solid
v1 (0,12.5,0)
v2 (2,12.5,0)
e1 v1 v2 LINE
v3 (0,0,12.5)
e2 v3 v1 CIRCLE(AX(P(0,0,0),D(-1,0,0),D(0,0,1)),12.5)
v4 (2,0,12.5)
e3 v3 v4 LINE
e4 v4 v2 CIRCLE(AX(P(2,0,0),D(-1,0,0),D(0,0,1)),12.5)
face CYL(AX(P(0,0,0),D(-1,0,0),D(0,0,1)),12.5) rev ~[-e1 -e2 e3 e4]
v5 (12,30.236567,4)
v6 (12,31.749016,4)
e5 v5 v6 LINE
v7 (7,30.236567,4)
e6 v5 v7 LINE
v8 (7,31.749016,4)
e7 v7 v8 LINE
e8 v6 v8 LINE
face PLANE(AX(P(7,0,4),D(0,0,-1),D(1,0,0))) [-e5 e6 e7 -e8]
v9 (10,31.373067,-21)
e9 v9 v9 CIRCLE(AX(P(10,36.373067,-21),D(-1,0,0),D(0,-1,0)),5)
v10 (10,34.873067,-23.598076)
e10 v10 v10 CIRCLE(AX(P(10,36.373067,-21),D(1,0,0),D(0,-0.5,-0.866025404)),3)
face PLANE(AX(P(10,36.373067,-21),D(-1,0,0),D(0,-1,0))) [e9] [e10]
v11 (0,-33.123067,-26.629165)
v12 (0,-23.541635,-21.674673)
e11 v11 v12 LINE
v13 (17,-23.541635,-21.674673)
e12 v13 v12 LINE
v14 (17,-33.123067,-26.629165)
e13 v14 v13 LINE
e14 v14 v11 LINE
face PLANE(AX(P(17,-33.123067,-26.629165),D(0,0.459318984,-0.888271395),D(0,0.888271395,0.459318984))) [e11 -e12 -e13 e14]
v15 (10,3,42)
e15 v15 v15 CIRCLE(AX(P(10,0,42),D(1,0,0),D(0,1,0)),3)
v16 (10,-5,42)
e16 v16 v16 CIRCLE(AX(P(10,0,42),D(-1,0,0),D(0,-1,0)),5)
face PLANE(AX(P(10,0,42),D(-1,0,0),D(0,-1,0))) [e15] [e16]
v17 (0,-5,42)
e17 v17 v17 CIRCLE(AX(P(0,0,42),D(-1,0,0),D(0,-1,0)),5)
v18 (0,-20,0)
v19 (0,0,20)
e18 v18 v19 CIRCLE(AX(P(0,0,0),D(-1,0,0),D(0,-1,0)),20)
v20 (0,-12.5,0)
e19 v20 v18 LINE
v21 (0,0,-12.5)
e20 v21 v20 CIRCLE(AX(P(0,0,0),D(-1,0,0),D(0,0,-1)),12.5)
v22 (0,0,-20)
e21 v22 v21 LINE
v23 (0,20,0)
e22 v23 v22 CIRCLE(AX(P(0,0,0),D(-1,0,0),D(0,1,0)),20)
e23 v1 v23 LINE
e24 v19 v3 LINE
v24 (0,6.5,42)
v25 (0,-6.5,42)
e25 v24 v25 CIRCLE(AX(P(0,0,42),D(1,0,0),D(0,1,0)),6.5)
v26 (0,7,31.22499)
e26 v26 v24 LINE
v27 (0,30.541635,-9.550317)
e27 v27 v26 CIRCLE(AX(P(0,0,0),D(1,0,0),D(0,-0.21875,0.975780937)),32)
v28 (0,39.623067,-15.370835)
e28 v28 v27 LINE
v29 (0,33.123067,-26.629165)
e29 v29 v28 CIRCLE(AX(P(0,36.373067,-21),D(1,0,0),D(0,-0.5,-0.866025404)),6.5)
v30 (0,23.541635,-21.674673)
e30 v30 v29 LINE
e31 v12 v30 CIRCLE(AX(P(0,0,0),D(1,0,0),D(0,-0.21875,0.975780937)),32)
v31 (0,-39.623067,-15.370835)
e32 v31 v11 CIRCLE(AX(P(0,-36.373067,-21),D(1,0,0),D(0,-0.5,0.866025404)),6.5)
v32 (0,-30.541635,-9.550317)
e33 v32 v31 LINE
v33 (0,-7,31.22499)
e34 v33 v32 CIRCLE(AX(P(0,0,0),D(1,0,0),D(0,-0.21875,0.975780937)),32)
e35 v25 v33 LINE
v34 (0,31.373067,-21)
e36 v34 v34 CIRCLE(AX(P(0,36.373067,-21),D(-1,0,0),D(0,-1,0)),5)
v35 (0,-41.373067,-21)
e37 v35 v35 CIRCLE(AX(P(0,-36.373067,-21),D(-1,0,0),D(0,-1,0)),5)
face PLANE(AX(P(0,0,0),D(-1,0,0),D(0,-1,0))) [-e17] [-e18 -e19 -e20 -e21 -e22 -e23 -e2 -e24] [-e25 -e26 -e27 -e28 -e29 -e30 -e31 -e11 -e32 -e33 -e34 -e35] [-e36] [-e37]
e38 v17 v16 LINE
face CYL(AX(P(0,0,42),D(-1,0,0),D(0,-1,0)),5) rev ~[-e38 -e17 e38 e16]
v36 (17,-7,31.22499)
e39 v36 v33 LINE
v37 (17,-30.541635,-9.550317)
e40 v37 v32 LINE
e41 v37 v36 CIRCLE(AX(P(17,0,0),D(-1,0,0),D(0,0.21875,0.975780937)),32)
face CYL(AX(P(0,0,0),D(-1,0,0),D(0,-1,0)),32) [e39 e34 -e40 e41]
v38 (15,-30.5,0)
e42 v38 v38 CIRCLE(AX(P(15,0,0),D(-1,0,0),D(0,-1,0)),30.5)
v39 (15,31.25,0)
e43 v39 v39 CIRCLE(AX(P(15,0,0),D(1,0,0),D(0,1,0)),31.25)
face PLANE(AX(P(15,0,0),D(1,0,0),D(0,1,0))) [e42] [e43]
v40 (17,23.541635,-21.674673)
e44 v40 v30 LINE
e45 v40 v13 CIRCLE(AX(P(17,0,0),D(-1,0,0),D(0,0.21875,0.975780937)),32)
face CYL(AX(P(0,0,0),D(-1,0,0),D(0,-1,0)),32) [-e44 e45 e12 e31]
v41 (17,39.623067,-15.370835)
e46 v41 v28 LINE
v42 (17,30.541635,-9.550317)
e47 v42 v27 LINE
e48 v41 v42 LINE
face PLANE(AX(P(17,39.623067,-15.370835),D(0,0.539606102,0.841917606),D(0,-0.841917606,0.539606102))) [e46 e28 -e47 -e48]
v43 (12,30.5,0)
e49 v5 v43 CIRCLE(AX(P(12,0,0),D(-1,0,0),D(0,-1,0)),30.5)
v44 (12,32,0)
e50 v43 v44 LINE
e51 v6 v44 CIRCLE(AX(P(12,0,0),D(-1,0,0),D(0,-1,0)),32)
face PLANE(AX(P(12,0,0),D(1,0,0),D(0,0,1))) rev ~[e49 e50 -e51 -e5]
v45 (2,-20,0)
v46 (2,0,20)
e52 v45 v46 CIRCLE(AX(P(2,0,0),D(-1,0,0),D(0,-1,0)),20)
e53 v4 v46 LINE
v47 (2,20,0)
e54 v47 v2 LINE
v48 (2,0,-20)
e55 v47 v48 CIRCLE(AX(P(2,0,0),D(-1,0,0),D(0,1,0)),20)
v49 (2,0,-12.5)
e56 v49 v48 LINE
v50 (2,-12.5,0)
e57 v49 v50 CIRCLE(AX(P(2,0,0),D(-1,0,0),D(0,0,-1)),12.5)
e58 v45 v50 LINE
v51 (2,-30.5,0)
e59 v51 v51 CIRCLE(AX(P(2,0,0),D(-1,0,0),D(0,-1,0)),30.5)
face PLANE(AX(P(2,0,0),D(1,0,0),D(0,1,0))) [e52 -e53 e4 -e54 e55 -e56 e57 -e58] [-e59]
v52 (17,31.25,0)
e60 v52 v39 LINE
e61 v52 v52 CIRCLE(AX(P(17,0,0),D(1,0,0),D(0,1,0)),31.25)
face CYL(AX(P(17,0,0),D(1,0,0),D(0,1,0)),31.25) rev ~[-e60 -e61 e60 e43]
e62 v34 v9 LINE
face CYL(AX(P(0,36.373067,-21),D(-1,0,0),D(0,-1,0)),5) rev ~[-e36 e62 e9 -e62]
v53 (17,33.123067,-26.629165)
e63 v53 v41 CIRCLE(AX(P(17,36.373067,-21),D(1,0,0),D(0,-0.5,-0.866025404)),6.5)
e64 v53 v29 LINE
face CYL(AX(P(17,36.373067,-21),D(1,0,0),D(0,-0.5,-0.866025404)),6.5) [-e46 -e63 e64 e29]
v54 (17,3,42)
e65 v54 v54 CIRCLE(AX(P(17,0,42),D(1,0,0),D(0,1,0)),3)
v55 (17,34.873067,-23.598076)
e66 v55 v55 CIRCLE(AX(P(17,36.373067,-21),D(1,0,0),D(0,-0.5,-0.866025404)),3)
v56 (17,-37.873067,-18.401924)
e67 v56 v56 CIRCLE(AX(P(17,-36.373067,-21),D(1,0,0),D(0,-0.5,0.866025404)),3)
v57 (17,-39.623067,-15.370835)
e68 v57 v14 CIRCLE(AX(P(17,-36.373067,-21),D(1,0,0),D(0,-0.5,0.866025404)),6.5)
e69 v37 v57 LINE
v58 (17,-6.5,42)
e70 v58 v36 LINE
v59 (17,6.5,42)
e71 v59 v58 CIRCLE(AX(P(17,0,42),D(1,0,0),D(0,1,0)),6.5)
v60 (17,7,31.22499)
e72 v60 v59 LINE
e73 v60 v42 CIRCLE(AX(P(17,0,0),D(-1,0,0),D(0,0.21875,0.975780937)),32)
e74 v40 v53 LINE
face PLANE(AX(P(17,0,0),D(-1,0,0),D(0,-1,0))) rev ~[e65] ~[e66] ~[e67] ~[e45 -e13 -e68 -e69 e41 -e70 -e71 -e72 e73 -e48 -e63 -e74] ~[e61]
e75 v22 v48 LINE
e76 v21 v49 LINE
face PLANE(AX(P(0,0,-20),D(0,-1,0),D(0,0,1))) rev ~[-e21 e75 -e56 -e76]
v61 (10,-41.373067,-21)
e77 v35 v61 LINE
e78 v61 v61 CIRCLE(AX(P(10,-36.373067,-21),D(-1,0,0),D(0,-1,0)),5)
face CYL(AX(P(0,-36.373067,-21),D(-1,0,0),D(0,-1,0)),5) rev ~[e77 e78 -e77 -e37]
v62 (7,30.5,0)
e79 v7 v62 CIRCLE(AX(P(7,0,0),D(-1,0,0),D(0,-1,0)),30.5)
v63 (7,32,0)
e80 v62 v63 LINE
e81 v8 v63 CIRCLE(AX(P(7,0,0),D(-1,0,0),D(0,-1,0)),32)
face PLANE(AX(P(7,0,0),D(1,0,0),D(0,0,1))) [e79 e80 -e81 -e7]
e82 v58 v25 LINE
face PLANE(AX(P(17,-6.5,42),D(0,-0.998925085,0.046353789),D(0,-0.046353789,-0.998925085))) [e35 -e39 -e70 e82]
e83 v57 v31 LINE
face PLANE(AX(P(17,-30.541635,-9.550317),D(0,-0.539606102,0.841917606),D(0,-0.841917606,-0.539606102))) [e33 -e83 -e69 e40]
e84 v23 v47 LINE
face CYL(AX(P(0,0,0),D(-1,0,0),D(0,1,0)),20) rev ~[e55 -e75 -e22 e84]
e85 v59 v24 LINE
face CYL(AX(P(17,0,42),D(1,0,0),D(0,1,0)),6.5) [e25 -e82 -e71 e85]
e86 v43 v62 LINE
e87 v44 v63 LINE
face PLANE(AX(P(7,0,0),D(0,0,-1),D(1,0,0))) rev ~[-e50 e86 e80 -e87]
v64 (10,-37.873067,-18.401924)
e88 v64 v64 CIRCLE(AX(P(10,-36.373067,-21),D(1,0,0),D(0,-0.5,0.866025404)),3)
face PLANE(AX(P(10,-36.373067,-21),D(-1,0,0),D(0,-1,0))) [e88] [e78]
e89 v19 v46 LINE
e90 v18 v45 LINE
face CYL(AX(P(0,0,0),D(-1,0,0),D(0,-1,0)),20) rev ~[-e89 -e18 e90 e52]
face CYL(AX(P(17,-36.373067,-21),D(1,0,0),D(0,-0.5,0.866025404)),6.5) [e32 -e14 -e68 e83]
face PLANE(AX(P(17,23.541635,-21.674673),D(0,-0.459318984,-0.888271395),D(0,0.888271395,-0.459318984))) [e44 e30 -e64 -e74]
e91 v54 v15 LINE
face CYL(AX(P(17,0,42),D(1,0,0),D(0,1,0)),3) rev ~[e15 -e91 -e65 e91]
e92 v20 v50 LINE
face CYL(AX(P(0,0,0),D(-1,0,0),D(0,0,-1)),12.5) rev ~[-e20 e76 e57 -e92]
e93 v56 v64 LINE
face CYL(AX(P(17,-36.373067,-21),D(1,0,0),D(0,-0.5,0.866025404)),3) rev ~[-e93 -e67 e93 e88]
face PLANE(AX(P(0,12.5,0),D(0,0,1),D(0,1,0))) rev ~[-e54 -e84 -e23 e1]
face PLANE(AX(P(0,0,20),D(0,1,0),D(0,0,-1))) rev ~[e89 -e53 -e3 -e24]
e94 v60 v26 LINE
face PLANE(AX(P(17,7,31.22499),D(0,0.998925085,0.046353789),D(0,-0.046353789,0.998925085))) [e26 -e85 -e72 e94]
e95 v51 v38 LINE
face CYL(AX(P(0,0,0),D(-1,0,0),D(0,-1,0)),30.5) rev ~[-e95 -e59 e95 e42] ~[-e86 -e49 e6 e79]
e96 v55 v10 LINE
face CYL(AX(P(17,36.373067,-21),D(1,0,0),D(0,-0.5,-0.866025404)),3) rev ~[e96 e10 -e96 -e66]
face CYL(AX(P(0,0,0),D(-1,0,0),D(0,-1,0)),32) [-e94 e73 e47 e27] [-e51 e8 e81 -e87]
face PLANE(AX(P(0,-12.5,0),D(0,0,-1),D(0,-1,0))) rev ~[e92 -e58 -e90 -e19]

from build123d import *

# Parameters (mm, degrees)
F0_R            = 30.5
F0_R_2          = 9.5
F1_DEPTH        = 2
F2_R            = 32
F2_R_2          = 30.5
F3_DEPTH        = 17
F4_R            = 3
F5_DEPTH        = 17
F5_COPIES_COUNT = 3
F6_R            = 31.25
F7_DEPTH        = 2
F8_W            = 5
F8_H            = 4
F9_DEPTH        = 43.1
F10_R           = 5
F11_DEPTH       = 10
F13_DEPTH       = 25


# Not quite as in the source:
# - a pattern or mirror of a feature is missing from the dataset's text; its kind, count and spacing are read off the source's solid


with BuildPart() as f1:
    # F0 (on Right) → F1 (new body)
    with BuildSketch(Plane.YZ):
        Circle(F0_R)
        Circle(F0_R_2, mode=Mode.SUBTRACT)
    extrude(amount=F1_DEPTH)

    # F2 (on face) → F3 (join)
    with BuildSketch(Plane(origin=(0, 0, 0), x_dir=(0, -1, 0), z_dir=(-1, 0, 0))):
        Circle(F2_R)
        Circle(F2_R_2, mode=Mode.SUBTRACT)
    extrude(amount=-F3_DEPTH)

    # F4 (on face) → F5 (join)
    with BuildSketch(Plane.YZ.offset(17)):
        with BuildLine():
            ThreePointArc((-6.5, 42), (0, 35.5), (6.5, 42))
            ThreePointArc((6.5, 42), (0, 48.5), (-6.5, 42))
        make_face()
        with Locations((0, 42)):
            Circle(F4_R, mode=Mode.SUBTRACT)
        with BuildLine():
            Line((7, 31.224989992), (6.5, 42))
            ThreePointArc((6.5, 42), (0, 35.5), (-6.5, 42))
            Line((-6.5, 42), (-7, 31.224989992))
            ThreePointArc((-7, 31.224989992), (0, 32), (7, 31.224989992))
        make_face()
    f5 = extrude(amount=-F5_DEPTH)

    # F5_copies: F5 ×3 about axis
    f5_copies_axis = Axis((0, 0, 0), (1, 0, 0))
    for i in range(1, F5_COPIES_COUNT):
        add(f5.rotate(f5_copies_axis, i * 360 / F5_COPIES_COUNT))

    # F6 (on face) → F7 (cut)
    with BuildSketch(Plane.YZ.offset(17)):
        Circle(F6_R)
    extrude(amount=-F7_DEPTH, mode=Mode.SUBTRACT)

    # F8 (on Front) → F9 (cut)
    with BuildSketch(Plane.XZ):
        with Locations((9.5, 2)):
            Rectangle(F8_W, F8_H)
    extrude(amount=-F9_DEPTH, mode=Mode.SUBTRACT)

    # F10 (on face) → F11 (cut)
    with BuildSketch(Plane(origin=(0, 0, 0), x_dir=(0, -1, 0), z_dir=(-1, 0, 0))):
        with Locations((-36.3730669589, -21)):
            Circle(F10_R)
        with Locations((0, 42)):
            Circle(F10_R)
        with Locations((36.3730669589, -21)):
            Circle(F10_R)
    extrude(amount=-F11_DEPTH, mode=Mode.SUBTRACT)

    # F12 (on face) → F13 (cut)
    with BuildSketch(Plane(origin=(0, 0, 0), x_dir=(0, -1, 0), z_dir=(-1, 0, 0))):
        with BuildLine():
            Line((-12.5, 0), (-20, 0))
            ThreePointArc((-20, 0), (-14.1421356237, -14.1421356237), (0, -20))
            Line((0, -20), (0, -12.5))
            ThreePointArc((0, -12.5), (8.8388347648, -8.8388347648), (12.5, 0))
            Line((12.5, 0), (20, 0))
            ThreePointArc((20, 0), (14.1421356237, 14.1421356237), (0, 20))
            Line((0, 20), (0, 12.5))
            ThreePointArc((0, 12.5), (-8.8388347648, 8.8388347648), (-12.5, 0))
        make_face()
    extrude(amount=-F13_DEPTH, mode=Mode.SUBTRACT)


solid = f1.part
